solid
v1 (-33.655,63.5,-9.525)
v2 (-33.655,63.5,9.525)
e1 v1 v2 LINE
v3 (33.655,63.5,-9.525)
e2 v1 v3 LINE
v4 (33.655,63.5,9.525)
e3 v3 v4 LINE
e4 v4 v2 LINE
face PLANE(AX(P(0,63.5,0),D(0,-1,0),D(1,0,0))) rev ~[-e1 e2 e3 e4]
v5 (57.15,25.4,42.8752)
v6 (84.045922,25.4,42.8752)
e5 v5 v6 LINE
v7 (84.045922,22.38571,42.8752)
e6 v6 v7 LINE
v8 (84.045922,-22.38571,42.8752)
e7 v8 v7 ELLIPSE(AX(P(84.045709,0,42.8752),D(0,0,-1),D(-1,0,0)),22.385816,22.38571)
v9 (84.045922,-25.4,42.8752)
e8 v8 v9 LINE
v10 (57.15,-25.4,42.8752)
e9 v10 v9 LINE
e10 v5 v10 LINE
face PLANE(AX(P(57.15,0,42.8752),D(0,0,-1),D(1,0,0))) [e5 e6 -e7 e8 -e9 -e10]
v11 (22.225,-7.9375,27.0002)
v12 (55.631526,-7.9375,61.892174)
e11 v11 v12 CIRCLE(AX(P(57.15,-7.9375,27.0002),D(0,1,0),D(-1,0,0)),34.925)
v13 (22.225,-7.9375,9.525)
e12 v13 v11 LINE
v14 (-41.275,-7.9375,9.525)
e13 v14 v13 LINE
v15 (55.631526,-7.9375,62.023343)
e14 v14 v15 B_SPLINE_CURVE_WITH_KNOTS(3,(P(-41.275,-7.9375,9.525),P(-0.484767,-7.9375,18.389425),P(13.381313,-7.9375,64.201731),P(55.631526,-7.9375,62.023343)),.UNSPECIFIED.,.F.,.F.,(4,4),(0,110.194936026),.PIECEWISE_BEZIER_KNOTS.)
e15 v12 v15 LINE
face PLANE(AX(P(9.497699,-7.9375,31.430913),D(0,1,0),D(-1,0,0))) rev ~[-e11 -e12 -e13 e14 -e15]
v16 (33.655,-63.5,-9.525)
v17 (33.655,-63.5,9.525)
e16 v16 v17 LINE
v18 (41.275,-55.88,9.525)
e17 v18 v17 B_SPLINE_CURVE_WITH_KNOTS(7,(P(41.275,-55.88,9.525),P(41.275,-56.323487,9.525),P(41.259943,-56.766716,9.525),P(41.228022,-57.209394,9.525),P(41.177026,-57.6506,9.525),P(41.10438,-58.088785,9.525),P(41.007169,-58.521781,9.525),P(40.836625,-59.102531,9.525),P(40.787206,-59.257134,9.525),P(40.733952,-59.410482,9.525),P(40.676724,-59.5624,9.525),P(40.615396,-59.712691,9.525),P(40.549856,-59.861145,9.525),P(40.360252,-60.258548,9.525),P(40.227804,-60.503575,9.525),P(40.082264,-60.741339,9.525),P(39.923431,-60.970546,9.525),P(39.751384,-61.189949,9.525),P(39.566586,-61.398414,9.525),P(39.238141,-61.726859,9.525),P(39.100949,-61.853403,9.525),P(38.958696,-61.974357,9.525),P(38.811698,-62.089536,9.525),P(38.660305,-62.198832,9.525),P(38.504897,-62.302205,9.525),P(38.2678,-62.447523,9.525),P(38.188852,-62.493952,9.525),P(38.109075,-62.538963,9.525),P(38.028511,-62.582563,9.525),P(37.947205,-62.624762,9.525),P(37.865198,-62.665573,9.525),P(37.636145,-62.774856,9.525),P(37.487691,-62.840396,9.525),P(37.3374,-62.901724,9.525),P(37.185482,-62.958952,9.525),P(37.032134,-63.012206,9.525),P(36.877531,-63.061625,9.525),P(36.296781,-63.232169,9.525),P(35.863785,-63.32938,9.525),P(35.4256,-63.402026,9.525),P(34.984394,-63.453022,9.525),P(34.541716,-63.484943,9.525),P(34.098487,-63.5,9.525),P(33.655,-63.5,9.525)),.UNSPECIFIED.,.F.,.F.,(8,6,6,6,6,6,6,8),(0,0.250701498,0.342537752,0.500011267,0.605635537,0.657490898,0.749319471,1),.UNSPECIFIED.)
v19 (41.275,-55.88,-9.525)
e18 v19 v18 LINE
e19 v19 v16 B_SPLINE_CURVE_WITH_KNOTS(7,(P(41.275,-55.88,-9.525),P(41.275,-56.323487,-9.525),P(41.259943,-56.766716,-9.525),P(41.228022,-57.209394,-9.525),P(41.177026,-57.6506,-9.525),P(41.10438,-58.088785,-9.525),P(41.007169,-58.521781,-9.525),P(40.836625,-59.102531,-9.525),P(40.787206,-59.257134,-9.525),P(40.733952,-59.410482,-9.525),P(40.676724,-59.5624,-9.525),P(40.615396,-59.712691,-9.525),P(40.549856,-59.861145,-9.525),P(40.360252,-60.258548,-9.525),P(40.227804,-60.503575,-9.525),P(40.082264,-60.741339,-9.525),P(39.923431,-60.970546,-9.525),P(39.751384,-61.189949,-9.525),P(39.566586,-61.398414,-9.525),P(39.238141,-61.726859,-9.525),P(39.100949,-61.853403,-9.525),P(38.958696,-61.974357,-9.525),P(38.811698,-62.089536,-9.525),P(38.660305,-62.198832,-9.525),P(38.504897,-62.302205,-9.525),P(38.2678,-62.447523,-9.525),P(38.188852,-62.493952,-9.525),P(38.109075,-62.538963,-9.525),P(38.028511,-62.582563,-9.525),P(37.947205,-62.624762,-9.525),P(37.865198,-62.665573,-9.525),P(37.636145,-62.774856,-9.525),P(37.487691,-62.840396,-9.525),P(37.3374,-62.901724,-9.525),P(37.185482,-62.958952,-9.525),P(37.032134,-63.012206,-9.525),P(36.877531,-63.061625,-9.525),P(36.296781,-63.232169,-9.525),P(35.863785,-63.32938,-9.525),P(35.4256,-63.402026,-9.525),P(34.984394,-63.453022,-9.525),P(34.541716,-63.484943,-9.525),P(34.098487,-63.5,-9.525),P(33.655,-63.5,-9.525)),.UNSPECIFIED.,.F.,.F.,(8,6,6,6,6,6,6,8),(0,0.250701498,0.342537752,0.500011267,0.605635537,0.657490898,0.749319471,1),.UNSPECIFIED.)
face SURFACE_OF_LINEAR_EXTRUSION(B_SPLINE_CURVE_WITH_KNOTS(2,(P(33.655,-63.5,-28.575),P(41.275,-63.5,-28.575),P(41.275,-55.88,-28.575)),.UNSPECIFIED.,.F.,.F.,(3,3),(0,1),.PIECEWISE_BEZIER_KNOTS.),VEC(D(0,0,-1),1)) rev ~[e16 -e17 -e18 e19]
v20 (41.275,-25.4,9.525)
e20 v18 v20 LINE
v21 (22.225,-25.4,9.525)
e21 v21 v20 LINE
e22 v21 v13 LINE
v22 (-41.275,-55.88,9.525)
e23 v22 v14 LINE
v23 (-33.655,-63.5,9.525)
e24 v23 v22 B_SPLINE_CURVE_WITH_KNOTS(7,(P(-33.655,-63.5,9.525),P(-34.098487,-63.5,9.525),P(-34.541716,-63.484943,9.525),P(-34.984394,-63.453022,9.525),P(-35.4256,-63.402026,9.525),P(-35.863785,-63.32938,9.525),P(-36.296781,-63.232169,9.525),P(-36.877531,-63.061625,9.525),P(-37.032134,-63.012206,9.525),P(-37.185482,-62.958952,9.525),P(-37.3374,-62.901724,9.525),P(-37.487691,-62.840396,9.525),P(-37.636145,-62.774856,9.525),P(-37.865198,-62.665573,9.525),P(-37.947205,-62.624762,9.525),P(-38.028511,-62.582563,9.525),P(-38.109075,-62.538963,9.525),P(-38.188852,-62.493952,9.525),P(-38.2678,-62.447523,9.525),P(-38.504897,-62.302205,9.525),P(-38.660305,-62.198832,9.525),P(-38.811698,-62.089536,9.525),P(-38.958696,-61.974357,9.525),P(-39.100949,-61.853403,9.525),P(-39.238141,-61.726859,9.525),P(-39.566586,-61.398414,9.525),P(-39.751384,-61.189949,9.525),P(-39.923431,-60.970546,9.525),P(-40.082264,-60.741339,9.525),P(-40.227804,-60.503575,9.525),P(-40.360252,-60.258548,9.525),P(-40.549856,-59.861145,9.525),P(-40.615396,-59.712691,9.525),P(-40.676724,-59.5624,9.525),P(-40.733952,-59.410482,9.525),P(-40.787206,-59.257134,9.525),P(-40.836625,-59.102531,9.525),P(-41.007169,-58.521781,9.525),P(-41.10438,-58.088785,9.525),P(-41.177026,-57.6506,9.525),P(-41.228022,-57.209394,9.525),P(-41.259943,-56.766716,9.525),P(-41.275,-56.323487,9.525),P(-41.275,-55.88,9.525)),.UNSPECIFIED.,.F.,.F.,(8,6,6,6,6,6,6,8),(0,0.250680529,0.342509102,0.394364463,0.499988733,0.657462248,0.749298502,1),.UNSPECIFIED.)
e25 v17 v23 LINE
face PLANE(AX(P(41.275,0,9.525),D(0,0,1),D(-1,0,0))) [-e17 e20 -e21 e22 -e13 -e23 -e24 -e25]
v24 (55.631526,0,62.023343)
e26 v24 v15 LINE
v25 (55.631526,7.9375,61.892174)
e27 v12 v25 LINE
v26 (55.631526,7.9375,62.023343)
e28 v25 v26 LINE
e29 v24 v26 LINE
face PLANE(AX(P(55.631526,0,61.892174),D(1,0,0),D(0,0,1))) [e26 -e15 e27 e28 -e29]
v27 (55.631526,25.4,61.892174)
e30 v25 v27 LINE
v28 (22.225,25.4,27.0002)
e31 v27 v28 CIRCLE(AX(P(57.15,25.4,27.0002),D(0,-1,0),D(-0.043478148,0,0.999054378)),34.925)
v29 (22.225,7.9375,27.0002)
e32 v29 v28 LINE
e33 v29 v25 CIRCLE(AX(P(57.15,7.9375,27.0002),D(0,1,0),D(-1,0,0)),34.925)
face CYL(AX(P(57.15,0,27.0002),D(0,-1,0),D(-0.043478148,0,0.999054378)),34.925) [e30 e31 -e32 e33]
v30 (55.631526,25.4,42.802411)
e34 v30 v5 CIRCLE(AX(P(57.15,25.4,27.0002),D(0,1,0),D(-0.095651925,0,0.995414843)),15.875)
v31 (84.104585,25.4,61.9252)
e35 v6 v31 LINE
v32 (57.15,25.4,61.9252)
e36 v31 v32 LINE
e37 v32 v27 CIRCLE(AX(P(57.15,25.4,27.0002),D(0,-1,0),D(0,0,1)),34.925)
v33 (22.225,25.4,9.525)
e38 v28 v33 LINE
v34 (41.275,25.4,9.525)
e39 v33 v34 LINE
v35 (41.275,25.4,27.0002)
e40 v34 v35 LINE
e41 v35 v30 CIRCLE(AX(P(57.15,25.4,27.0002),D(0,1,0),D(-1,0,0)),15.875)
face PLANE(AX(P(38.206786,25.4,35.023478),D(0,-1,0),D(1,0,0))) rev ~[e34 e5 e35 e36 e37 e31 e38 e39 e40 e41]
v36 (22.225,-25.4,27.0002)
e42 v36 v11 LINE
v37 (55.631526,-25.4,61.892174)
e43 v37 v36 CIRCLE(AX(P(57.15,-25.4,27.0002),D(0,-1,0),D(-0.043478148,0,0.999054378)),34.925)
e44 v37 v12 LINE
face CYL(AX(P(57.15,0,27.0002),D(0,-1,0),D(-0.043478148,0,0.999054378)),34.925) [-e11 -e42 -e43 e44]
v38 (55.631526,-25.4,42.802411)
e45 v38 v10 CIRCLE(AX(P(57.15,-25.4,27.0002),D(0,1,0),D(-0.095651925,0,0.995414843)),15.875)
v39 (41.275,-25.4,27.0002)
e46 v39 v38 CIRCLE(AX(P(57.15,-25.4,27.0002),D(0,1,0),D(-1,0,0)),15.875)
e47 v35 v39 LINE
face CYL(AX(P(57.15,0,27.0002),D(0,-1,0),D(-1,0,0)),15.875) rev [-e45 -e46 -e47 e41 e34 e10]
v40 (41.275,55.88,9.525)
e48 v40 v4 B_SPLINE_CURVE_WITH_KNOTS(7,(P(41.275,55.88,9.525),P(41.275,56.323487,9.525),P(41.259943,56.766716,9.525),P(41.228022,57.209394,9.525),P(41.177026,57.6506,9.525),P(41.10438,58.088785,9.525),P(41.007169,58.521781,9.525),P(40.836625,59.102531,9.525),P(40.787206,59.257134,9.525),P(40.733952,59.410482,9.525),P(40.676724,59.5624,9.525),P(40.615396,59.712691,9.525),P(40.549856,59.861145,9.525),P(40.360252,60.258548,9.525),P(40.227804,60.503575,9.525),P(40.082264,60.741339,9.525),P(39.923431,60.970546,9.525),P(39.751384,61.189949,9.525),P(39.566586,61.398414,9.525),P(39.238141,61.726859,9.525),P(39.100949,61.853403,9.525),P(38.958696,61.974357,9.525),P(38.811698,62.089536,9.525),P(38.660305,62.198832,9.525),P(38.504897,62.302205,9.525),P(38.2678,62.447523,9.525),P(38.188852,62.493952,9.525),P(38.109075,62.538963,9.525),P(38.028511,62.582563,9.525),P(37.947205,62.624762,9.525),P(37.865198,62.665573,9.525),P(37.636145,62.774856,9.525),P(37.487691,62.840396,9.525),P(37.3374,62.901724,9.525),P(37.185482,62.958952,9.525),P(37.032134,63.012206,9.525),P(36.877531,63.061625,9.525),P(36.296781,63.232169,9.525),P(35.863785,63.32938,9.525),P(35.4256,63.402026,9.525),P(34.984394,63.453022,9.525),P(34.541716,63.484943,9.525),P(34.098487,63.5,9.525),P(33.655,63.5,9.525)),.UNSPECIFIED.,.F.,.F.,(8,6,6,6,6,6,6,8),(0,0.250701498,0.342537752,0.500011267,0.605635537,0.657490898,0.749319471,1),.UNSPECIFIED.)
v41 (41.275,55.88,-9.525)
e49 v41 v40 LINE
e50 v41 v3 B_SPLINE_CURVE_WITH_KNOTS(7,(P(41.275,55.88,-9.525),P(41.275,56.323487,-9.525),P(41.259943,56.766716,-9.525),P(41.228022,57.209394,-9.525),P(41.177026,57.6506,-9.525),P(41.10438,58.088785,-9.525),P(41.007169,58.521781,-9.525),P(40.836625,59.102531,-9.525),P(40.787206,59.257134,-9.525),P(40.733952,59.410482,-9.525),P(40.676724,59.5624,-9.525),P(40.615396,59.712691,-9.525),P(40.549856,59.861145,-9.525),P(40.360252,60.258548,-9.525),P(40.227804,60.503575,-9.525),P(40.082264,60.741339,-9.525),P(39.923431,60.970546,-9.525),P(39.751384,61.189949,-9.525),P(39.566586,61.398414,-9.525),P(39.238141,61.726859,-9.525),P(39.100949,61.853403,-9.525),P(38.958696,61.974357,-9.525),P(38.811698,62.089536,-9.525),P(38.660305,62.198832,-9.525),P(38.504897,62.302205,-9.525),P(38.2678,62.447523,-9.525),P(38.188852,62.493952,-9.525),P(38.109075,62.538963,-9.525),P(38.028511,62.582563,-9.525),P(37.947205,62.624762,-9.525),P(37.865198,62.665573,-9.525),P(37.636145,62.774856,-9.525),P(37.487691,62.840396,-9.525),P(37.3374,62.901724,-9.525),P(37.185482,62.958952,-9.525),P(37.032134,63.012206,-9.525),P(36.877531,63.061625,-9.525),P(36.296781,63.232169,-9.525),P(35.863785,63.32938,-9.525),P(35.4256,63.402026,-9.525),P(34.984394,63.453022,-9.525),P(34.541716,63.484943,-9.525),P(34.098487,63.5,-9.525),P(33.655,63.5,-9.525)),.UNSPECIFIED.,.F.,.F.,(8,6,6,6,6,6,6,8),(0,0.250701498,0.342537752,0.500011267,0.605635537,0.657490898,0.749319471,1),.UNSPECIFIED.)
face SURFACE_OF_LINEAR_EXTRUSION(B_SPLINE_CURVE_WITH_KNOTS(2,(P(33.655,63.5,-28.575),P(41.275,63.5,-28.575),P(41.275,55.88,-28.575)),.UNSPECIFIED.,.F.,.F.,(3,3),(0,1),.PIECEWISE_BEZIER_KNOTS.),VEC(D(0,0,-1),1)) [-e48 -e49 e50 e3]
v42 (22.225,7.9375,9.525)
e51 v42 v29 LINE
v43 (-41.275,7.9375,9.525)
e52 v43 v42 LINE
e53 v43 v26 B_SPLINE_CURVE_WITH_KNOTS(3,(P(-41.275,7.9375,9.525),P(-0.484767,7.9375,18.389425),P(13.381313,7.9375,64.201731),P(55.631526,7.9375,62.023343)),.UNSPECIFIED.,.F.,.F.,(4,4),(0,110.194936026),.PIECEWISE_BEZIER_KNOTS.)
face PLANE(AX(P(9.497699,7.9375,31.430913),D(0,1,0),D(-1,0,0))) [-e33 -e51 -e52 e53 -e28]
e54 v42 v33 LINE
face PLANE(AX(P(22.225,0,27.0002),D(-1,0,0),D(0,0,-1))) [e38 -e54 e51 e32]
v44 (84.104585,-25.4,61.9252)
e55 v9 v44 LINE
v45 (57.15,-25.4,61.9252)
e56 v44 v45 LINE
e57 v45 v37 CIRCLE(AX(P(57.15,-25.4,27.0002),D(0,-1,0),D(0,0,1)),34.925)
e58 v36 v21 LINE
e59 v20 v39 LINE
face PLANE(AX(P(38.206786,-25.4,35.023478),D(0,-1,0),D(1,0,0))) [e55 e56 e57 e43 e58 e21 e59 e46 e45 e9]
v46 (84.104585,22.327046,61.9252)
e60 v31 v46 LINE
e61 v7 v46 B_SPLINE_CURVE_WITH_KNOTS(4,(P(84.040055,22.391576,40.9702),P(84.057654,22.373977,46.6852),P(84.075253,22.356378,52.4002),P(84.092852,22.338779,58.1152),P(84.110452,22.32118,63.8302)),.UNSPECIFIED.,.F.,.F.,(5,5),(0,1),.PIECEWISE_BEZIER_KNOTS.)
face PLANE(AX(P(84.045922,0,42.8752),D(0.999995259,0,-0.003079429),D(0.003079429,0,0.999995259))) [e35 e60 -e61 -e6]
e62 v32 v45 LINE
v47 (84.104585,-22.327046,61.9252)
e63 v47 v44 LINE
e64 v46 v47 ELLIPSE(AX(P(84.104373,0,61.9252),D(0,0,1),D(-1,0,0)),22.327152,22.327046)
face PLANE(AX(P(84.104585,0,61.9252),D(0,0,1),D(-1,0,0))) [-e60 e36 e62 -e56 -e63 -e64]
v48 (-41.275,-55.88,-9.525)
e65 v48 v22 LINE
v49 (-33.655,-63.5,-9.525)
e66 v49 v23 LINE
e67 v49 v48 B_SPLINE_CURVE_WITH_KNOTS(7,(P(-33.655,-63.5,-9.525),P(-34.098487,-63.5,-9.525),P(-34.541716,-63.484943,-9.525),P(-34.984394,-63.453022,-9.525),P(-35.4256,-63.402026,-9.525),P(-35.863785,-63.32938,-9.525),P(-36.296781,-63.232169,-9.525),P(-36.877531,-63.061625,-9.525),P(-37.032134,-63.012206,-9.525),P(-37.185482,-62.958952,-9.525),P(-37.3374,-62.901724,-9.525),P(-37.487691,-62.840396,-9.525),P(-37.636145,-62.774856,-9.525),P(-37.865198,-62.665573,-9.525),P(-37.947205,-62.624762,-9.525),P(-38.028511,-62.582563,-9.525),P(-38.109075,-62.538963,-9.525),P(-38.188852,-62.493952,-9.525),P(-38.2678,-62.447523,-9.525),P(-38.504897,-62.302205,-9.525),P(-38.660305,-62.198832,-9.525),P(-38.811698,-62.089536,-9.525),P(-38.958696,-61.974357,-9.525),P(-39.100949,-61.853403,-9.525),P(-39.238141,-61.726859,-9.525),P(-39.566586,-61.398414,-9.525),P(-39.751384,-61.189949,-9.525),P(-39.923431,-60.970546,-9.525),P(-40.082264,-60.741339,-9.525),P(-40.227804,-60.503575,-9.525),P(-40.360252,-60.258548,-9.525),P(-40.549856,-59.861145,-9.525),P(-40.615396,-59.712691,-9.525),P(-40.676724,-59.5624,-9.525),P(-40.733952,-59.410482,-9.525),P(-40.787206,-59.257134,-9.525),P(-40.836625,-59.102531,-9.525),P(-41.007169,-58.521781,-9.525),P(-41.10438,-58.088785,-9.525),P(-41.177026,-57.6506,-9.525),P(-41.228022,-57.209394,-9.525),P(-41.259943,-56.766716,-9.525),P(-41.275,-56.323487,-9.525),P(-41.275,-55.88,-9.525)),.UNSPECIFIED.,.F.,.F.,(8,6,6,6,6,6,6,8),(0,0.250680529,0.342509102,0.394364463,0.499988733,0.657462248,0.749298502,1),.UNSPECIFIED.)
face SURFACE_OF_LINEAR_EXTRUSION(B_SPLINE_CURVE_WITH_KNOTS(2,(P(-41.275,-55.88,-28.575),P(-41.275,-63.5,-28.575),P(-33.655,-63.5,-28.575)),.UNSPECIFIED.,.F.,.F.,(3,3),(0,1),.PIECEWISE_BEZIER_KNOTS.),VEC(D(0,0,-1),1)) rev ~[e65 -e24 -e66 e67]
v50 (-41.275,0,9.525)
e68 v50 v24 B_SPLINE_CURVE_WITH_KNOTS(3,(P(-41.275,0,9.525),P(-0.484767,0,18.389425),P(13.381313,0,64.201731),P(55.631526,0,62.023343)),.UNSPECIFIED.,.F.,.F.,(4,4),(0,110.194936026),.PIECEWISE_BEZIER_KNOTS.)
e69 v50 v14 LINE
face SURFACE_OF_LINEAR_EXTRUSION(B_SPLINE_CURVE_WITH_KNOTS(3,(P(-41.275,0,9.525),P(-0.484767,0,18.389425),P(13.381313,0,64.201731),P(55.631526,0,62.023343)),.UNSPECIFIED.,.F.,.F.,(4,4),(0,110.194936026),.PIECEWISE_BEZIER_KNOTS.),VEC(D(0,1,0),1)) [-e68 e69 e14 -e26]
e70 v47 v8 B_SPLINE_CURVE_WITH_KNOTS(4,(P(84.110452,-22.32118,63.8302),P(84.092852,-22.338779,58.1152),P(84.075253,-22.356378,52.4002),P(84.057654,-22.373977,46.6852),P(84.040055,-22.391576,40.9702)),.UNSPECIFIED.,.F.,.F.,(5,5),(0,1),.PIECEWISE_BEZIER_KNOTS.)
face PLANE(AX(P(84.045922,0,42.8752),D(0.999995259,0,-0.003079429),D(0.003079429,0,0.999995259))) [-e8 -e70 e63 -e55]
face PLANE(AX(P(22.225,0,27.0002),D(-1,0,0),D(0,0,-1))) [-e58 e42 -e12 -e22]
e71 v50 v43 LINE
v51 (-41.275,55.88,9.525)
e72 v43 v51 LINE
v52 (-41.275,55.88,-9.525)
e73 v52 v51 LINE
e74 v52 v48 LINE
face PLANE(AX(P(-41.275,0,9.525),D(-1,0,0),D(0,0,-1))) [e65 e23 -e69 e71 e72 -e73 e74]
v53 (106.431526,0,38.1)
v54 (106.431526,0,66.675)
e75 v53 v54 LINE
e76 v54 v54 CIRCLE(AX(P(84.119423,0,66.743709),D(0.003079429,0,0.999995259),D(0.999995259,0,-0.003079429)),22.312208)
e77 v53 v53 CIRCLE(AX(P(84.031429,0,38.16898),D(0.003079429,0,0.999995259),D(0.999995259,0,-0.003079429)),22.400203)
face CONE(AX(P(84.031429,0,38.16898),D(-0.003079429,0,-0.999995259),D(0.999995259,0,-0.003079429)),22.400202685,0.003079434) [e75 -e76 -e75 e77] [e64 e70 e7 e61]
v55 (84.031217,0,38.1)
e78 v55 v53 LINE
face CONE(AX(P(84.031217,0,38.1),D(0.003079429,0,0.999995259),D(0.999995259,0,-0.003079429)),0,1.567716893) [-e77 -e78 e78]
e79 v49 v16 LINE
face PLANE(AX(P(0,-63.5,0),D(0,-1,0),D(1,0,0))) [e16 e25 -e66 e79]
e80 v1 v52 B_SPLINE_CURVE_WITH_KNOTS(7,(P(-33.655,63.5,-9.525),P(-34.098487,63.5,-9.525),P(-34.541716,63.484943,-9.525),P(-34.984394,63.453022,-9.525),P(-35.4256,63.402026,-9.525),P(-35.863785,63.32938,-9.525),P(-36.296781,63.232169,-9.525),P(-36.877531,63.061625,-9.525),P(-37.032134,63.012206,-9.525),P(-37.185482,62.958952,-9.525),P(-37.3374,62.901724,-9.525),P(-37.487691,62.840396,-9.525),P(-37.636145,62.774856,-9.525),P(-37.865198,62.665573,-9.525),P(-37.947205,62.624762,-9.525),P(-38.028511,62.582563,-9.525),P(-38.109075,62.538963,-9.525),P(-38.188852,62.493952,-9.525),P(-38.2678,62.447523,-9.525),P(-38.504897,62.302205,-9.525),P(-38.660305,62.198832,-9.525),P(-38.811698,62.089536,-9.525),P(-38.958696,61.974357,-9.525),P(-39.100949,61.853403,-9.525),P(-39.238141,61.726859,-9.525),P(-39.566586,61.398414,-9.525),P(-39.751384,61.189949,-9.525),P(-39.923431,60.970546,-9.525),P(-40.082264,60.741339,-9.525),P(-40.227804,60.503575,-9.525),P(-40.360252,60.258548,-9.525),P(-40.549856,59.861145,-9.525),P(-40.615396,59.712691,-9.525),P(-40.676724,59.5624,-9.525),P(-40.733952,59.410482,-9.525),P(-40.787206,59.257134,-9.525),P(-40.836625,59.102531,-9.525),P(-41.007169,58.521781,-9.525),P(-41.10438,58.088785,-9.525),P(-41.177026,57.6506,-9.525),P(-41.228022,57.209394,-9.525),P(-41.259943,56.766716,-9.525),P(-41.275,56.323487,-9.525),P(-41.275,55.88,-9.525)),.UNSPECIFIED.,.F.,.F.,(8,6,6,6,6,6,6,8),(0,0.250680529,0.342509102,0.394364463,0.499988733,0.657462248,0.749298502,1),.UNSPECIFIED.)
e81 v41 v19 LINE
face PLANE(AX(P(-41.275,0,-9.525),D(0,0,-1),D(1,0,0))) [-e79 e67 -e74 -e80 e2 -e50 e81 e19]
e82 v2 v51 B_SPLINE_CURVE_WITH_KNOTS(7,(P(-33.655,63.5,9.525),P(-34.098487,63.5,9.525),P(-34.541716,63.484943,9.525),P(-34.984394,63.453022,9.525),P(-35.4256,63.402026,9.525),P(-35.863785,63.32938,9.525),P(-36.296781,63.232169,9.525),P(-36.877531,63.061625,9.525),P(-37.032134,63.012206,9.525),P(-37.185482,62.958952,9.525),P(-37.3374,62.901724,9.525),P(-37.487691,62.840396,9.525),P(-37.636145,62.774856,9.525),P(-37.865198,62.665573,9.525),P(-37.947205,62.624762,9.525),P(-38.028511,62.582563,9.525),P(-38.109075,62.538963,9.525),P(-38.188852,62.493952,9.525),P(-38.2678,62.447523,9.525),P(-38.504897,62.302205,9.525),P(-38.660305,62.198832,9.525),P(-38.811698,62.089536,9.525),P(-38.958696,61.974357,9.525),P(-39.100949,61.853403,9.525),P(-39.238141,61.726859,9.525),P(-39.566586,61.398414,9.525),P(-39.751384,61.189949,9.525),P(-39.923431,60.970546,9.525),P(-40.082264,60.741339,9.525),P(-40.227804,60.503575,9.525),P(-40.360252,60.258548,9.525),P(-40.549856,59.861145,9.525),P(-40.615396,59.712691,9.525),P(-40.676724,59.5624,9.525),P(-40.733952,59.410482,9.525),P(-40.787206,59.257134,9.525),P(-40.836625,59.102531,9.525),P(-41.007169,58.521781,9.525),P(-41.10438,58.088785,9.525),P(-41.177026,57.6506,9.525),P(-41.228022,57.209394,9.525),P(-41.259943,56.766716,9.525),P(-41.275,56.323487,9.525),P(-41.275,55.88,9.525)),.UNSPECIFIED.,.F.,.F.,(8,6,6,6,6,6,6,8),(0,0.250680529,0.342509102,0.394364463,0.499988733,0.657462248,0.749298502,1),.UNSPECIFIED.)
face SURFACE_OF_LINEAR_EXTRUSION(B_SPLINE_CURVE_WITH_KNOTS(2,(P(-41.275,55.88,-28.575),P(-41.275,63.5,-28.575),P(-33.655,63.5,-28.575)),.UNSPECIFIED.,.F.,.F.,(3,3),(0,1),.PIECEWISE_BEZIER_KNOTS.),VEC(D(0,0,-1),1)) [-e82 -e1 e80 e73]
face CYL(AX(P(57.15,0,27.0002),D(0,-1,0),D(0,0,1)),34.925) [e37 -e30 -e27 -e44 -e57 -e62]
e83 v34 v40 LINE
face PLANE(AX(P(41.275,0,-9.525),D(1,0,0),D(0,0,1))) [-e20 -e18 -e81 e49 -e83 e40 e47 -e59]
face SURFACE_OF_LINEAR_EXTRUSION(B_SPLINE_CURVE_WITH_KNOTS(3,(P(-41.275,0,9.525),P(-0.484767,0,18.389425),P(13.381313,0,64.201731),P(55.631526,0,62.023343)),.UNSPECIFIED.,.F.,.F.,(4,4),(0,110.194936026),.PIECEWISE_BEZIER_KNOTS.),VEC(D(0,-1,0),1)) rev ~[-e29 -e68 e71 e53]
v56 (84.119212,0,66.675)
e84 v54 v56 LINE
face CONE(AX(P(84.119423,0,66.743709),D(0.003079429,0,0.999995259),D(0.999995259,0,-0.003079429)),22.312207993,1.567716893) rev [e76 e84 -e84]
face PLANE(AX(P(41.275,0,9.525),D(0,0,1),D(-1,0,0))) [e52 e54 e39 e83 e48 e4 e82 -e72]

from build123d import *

# Parameters (mm, degrees)
F1_DEPTH    = 63.5
F2_DEPTH    = 25.4
F3_DEPTH    = 7.9375
F5_T1_DEPTH = 57.15


# Not quite as in the source:
# - a fillet or chamfer that OpenCascade refuses, or shapes differently, is made with other operations: its cross-section is extruded or revolved along the edge and cut away or added


with BuildPart() as f1:
    # F0 (on Front) → F1 (new body, symmetric)
    with BuildSketch(Plane.XZ):
        Polygon((-41.275, 9.525), (-41.275, -9.525), (41.275, -9.525), (41.275, 9.525), (22.225, 9.525), align=None)
    extrude(amount=F1_DEPTH, both=True)

    # F0 (on Front) → F2 (join, symmetric)
    with BuildSketch(Plane.XZ):
        with BuildLine():
            Line((22.225, 9.525), (41.275, 9.525))
            Line((41.275, 9.525), (41.275, 27.0002))
            ThreePointArc((41.275, 27.0002), (45.4000764986, 37.6751671059), (55.631525696, 42.8024106298))
            Line((55.631525696, 42.8024106298), (55.631525696, 61.8921741601))
            ThreePointArc((55.631525696, 61.8921741601), (31.9231458554, 51.1530767431), (22.225, 27.0002))
            Line((22.225, 27.0002), (22.225, 9.525))
        make_face()
        with BuildLine():
            ThreePointArc((57.15, 61.9252), (56.3905832965, 61.9169425639), (55.631525696, 61.8921741601))
            Line((55.631525696, 61.8921741601), (55.631525696, 42.8024106298))
            ThreePointArc((55.631525696, 42.8024106298), (56.3898910433, 42.8569922158), (57.15, 42.8752))
            Line((57.15, 42.8752), (84.0459217609, 42.8752))
            Line((84.0459217609, 42.8752), (84.1045851677, 61.9252))
            Line((84.1045851677, 61.9252), (57.15, 61.9252))
        make_face()
    extrude(amount=F2_DEPTH, both=True)

    # F0 (on Front) → F3 (join, symmetric)
    with BuildSketch(Plane.XZ):
        with BuildLine():
            add(Edge.make_bspline(
                [(-41.275, 9.525), (-0.4847672351, 18.3894253248), (13.3813129593, 64.201731175), (55.631525696, 62.0233434816)],
                knots=[0, 0, 0, 0, 110.1949360256, 110.1949360256, 110.1949360256, 110.1949360256], degree=3))
            Line((-41.275, 9.525), (22.225, 9.525))
            Line((22.225, 9.525), (22.225, 27.0002))
            ThreePointArc((22.225, 27.0002), (31.9231458554, 51.1530767431), (55.631525696, 61.8921741601))
            Line((55.631525696, 61.8921741601), (55.631525696, 62.0233434816))
        make_face()
    extrude(amount=F3_DEPTH, both=True)

    # F0 (on Front) → F4 (revolve)
    with BuildSketch(Plane.XZ):
        Polygon((106.431525696, 66.675), (84.1192119104, 66.675), (84.1045851677, 61.9252), (84.0459217609, 42.8752), (84.0312168002, 38.1), (106.431525696, 38.1), align=None)
    revolve(axis=Axis((84.0752143553, 0, 52.3875), (0.0030794293, 0, 0.9999952585)))

    # F5: fillet of radius 7.62 on 4 edges, made by hand

    # F5_s2 → F5_t1 (cut)
    with BuildSketch(Plane.XY.offset(-28.575)):
        with BuildLine():
            add(Edge.make_bspline(
                [(-41.275, -55.88), (-41.275, -63.5), (-33.655, -63.5)],
                knots=[0, 0, 0, 1, 1, 1], degree=2, weights=[1, 1, 1]))
            Line((-33.655, -63.5), (-41.275, -63.5))
            Line((-41.275, -63.5), (-41.275, -55.88))
        make_face()
        with BuildLine():
            add(Edge.make_bspline(
                [(33.655, -63.5), (41.275, -63.5), (41.275, -55.88)],
                knots=[0, 0, 0, 1, 1, 1], degree=2, weights=[1, 1, 1]))
            Line((41.275, -55.88), (41.275, -63.5))
            Line((41.275, -63.5), (33.655, -63.5))
        make_face()
        with BuildLine():
            add(Edge.make_bspline(
                [(-41.275, 55.88), (-41.275, 63.5), (-33.655, 63.5)],
                knots=[0, 0, 0, 1, 1, 1], degree=2, weights=[1, 1, 1]))
            Line((-33.655, 63.5), (-41.275, 63.5))
            Line((-41.275, 63.5), (-41.275, 55.88))
        make_face()
        with BuildLine():
            add(Edge.make_bspline(
                [(33.655, 63.5), (41.275, 63.5), (41.275, 55.88)],
                knots=[0, 0, 0, 1, 1, 1], degree=2, weights=[1, 1, 1]))
            Line((41.275, 55.88), (41.275, 63.5))
            Line((41.275, 63.5), (33.655, 63.5))
        make_face()
    extrude(amount=F5_T1_DEPTH, mode=Mode.SUBTRACT)


solid = f1.part
